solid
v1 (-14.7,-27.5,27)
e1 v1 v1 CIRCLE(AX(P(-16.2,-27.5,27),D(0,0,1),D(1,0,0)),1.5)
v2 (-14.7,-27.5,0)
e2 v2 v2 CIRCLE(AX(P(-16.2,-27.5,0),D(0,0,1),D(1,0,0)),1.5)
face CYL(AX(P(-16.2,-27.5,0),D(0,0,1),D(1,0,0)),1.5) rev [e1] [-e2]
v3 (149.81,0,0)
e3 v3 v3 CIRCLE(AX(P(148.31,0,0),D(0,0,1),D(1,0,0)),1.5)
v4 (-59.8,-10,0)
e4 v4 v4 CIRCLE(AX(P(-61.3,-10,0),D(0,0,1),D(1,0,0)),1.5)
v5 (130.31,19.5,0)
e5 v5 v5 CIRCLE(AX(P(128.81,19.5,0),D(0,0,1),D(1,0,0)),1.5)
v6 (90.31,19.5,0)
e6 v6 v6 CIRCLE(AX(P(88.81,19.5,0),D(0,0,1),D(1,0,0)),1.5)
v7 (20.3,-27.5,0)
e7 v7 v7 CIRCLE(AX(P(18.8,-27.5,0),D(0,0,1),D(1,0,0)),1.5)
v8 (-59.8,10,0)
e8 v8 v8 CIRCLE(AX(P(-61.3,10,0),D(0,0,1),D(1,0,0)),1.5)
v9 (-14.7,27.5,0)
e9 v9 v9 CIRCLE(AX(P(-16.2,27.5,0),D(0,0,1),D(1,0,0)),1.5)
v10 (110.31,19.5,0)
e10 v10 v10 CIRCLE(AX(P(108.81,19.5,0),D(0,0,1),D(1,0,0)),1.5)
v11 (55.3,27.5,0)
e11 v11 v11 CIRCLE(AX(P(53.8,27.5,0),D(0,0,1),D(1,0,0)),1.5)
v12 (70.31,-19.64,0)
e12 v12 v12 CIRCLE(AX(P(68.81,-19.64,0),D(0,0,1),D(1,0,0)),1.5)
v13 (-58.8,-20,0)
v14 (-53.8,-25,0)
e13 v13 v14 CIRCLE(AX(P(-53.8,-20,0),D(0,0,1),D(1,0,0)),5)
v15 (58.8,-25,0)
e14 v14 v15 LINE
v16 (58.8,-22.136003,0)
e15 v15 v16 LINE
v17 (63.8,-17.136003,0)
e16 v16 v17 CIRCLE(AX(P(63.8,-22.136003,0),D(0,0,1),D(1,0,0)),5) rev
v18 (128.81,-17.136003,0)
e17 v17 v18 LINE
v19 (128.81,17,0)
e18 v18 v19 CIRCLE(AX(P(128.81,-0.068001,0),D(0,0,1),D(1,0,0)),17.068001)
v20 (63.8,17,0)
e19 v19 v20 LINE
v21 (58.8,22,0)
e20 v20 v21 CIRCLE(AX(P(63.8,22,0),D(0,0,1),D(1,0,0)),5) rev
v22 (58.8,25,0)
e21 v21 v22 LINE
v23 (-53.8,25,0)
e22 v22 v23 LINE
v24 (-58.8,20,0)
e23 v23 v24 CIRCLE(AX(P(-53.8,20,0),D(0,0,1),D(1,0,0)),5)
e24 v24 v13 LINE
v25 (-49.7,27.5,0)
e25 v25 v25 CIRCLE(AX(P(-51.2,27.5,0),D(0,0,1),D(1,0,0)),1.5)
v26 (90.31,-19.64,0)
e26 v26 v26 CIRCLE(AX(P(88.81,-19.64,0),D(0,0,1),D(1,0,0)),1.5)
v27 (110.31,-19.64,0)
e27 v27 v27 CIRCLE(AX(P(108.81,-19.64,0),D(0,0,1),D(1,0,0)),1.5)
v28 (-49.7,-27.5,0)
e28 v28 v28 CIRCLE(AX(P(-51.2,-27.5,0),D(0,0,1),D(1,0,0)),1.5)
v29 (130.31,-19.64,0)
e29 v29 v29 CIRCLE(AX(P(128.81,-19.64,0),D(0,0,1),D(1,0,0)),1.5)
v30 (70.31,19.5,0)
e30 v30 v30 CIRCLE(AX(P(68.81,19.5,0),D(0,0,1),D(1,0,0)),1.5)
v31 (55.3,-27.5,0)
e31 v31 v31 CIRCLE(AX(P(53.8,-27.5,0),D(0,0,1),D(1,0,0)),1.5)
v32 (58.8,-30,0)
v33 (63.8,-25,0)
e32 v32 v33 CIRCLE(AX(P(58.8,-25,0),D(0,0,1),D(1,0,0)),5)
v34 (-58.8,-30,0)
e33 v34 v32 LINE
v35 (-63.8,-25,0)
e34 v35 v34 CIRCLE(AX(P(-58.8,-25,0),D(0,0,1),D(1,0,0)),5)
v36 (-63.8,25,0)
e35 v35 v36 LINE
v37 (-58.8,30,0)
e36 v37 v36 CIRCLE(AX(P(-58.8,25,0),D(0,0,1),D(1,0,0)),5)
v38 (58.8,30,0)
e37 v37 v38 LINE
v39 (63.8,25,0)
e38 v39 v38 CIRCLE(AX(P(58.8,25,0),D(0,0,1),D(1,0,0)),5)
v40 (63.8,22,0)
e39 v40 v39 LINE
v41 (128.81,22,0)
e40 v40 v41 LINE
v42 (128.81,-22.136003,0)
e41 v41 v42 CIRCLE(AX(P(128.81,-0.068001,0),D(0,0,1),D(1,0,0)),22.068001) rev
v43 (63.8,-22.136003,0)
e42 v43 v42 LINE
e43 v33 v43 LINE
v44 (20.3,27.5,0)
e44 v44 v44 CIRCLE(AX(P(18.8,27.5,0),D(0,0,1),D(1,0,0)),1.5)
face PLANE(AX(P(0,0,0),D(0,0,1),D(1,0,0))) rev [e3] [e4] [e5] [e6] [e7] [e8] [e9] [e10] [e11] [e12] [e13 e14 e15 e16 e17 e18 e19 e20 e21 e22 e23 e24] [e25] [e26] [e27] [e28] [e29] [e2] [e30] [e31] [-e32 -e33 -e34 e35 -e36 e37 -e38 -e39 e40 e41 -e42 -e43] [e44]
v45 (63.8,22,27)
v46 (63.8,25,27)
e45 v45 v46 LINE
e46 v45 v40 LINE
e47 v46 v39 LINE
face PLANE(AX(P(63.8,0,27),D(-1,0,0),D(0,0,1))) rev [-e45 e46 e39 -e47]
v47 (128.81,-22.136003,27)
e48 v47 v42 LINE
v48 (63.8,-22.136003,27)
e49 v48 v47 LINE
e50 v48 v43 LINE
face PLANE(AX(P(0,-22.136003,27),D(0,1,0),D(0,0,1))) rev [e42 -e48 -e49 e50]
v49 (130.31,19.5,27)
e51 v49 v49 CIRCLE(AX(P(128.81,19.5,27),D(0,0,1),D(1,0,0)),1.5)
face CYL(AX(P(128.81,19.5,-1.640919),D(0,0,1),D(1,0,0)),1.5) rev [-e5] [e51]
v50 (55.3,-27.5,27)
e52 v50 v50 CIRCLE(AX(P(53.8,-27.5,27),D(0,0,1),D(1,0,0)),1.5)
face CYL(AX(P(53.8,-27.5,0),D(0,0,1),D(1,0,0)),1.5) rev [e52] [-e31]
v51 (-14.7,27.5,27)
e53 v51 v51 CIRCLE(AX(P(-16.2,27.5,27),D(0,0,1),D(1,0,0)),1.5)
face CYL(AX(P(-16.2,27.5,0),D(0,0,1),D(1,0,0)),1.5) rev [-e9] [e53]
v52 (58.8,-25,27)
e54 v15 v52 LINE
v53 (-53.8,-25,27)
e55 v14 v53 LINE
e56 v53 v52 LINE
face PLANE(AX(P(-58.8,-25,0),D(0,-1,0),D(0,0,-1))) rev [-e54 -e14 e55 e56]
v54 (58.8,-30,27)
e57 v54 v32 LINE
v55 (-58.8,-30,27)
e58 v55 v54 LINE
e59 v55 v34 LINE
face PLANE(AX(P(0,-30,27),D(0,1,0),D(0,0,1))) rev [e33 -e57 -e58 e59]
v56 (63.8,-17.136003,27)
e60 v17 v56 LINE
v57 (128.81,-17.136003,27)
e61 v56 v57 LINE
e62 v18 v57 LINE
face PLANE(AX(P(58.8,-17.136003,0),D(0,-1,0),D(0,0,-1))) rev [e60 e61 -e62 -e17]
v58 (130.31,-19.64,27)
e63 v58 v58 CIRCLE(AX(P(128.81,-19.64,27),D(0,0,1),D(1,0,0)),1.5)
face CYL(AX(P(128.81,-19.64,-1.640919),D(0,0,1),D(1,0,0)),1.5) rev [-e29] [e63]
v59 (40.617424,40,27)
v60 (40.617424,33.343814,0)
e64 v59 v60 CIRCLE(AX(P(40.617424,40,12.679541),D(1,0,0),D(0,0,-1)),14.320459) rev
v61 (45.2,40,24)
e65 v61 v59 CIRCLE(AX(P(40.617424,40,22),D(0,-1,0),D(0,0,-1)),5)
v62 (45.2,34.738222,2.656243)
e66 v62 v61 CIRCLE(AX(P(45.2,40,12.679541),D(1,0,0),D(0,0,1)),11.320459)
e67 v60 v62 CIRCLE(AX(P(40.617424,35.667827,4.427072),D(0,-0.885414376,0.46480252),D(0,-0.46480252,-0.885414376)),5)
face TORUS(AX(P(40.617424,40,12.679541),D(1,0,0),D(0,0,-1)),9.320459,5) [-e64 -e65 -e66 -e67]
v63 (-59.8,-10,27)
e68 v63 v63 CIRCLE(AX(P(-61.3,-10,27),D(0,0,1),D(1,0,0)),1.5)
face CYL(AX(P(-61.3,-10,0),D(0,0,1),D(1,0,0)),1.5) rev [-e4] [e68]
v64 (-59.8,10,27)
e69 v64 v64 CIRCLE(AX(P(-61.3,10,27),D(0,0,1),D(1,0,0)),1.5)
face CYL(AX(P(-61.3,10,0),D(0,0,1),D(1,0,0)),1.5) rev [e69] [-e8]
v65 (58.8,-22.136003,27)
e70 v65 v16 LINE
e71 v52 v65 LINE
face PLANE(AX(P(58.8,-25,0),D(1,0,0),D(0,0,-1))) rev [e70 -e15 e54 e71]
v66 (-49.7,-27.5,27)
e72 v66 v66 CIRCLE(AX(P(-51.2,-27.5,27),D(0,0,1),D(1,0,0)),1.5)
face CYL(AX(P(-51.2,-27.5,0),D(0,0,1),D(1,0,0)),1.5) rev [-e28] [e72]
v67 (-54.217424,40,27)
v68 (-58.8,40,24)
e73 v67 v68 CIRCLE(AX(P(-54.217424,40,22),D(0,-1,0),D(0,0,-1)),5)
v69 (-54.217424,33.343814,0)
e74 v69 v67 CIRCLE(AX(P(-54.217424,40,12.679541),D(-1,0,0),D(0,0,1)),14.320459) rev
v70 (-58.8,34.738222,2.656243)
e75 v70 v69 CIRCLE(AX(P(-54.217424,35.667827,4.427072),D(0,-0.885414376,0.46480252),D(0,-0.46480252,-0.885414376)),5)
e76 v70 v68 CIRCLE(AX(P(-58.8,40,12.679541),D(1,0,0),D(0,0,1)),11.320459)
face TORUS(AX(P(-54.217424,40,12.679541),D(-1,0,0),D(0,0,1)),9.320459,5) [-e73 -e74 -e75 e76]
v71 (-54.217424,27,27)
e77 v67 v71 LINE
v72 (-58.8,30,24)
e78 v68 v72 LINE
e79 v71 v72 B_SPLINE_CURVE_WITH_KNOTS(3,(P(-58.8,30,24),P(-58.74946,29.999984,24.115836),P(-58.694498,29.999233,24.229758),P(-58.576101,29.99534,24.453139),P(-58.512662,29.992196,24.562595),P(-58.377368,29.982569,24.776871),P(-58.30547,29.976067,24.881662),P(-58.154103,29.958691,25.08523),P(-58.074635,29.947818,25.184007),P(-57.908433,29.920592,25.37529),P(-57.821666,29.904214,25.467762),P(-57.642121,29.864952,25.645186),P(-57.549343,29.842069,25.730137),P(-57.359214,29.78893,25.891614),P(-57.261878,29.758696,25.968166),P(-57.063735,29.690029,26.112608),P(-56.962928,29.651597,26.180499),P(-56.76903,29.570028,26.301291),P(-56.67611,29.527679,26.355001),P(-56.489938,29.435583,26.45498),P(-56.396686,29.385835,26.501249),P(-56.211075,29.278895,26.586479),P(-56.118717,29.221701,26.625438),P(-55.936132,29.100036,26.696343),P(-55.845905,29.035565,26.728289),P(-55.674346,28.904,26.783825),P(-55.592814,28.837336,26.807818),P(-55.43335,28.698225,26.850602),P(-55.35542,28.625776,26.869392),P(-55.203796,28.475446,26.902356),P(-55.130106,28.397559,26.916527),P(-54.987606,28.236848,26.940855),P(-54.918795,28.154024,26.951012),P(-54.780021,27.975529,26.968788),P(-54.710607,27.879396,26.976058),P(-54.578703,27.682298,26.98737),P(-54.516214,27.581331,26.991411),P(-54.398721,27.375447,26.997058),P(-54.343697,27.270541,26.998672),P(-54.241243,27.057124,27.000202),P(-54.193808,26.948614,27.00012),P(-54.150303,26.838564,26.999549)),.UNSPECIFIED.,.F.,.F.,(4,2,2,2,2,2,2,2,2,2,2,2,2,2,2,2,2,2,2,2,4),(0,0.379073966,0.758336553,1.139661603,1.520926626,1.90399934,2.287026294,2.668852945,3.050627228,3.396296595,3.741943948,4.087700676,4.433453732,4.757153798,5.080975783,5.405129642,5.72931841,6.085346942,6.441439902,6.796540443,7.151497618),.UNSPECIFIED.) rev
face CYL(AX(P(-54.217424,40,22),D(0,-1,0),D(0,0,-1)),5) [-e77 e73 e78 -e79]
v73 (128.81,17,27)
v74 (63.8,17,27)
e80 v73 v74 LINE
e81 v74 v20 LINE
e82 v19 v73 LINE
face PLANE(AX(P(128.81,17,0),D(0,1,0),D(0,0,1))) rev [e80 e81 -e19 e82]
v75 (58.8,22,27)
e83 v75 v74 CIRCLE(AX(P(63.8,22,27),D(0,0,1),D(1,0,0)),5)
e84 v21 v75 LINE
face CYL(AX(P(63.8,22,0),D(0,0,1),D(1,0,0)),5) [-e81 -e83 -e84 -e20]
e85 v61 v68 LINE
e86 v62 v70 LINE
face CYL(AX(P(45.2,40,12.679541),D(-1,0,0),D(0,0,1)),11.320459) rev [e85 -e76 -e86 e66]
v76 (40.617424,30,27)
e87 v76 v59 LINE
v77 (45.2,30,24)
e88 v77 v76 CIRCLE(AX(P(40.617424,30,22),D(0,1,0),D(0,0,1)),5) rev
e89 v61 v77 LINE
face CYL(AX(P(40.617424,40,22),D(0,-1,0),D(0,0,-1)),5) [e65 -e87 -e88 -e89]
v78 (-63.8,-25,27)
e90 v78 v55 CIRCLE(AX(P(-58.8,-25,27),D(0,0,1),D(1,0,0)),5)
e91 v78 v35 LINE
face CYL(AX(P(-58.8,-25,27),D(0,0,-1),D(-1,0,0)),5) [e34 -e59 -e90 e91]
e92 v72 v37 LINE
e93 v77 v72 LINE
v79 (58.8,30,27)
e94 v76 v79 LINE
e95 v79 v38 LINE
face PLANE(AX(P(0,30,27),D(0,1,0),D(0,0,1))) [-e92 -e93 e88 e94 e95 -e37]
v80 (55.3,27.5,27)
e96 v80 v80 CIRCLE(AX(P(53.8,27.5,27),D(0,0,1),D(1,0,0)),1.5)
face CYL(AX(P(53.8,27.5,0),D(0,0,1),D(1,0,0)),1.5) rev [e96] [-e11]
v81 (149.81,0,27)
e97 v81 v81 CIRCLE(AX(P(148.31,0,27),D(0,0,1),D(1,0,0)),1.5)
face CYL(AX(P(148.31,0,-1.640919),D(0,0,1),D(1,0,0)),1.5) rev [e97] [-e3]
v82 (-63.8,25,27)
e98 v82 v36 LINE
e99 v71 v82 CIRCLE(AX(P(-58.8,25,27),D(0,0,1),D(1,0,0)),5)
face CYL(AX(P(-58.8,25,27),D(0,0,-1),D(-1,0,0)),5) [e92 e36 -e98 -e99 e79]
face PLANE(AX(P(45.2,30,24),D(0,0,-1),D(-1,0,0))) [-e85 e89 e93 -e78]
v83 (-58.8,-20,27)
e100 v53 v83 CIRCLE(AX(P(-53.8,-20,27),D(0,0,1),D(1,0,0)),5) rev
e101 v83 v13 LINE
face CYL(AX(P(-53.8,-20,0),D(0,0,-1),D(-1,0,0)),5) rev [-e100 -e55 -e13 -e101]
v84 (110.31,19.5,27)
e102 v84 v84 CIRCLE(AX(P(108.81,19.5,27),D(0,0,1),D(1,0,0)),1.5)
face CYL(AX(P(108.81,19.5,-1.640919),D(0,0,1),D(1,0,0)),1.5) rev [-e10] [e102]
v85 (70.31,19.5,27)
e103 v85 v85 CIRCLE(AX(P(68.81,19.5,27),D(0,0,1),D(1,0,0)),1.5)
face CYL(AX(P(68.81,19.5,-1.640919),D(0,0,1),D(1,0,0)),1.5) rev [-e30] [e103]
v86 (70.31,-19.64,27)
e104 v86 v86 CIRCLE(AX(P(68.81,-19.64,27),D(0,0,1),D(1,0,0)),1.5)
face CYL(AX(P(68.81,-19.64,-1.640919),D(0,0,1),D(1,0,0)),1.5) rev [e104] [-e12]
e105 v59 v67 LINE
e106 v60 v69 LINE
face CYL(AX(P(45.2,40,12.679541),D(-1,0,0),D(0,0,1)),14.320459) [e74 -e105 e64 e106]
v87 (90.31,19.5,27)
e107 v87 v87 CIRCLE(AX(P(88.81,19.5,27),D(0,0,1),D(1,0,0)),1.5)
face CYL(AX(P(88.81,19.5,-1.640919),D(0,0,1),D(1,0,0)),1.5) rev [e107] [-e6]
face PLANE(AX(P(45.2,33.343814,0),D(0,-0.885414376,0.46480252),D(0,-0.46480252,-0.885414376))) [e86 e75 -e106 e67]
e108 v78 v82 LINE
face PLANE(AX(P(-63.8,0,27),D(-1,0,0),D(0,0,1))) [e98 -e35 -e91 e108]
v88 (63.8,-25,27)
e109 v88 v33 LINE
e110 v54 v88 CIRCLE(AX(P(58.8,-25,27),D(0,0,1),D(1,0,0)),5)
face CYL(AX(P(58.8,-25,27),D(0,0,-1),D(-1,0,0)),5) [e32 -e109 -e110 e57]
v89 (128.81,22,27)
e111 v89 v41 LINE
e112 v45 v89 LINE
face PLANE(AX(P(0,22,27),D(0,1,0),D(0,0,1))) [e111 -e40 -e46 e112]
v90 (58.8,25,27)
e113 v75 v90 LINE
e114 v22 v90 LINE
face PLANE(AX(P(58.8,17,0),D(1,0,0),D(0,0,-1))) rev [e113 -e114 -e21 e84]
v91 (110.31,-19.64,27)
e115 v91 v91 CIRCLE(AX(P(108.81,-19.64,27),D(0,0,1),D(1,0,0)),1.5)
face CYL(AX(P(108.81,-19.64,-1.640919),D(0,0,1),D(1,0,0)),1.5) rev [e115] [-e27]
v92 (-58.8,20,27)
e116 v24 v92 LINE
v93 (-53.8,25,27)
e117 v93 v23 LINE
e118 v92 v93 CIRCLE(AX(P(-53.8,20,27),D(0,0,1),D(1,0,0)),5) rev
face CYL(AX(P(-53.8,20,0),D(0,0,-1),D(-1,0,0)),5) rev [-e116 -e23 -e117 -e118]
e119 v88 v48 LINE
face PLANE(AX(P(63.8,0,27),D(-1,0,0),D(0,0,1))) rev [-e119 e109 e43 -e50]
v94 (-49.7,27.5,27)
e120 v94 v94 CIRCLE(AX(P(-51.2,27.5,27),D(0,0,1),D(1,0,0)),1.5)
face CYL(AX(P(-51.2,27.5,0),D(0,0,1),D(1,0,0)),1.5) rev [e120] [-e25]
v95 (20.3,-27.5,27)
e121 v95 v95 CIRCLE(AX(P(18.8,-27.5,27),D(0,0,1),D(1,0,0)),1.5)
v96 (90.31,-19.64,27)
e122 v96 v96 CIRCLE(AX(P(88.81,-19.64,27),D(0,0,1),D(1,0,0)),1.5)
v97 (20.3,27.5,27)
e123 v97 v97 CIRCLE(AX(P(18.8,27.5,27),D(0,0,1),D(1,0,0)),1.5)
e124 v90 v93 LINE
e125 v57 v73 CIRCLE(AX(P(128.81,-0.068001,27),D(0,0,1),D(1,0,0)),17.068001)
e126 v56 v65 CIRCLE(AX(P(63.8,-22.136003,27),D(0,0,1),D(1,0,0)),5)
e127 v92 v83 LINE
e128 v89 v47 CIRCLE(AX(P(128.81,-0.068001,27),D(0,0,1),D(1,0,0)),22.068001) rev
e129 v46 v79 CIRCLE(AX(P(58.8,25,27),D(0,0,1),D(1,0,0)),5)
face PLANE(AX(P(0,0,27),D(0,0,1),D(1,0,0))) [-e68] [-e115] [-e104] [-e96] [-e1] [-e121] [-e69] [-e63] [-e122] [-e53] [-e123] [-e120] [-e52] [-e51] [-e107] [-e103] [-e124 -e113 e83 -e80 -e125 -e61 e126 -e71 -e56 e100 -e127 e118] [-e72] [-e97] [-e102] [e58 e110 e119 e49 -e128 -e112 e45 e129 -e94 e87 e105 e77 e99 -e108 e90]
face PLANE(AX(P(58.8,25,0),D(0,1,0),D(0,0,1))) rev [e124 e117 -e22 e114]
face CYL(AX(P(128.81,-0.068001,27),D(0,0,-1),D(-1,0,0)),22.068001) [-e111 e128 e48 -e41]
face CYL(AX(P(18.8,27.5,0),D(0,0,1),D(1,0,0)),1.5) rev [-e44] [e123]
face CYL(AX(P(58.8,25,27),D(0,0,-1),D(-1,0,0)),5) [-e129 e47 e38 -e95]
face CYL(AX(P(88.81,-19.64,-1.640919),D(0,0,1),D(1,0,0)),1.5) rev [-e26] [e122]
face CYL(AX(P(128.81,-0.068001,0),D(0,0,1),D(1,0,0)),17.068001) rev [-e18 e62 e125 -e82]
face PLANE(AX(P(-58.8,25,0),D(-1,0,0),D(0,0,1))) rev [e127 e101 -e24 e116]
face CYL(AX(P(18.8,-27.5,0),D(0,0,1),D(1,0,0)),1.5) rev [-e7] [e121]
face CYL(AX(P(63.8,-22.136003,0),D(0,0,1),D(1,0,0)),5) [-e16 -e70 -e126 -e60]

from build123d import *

# Parameters (mm, degrees)
SKETCH1_R            = 10.000000000000009
BOSS_EXTRUDE1_DEPTH  = 27
CUT_EXTRUDE3_DEPTH   = 157.18313390219527
SKETCH2_R            = 1.5000000000000042
CUT_EXTRUDE4_DEPTH   = 157.18313390219527
LPATTERN1_COUNT      = 4
LPATTERN1_PITCH      = 35
LPATTERN1_COUNT_DIR2 = 2
LPATTERN1_PITCH_DIR2 = 55
LPATTERN2_COUNT      = 2
LPATTERN2_PITCH      = 20
FILLET1_R            = 5
FILLET2_R            = 5
BOSS_EXTRUDE2_DEPTH  = 104
FILLET3_R            = 5
FILLET4_R            = 5
SKETCH13_R           = 1.4999999999999973
SKETCH13_R_2         = 1.4999999999999971
CUT_EXTRUDE8_DEPTH   = 163.89624264715565


with BuildPart() as part:
    # Sketch1 → Boss-Extrude1 (new body)
    # profile 1 of 2: a face of its own
    with BuildSketch(Plane.XY):
        with BuildLine():
            Line((128.8099999999999, 22), (63.80000000000001, 22))
            Line((63.800000000000026, 22), (63.800000000000026, -22.136002859999998))
            Line((63.80000000000001, -22.136002859999998), (128.8099999999999, -22.136002859999998))
            ThreePointArc((128.8099999999999, -22.136002859999998), (150.8780014299999, -0.06800142999999757), (128.8099999999999, 22))
        make_face()
        with Locations((128.81, 0)):
            Circle(SKETCH1_R, mode=Mode.SUBTRACT)
    # profile 2 of 2: a face of its own
    with BuildSketch(Plane.XY):
        with BuildLine():
            Line((-58.799999999999976, 29.999999999999993), (58.80000000000002, 29.999999999999993))
            ThreePointArc((58.80000000000002, 29.999999999999993), (62.33553390593276, 28.535533905932734), (63.800000000000026, 24.999999999999993))
            Line((63.800000000000026, 24.999999999999993), (63.800000000000026, -25))
            ThreePointArc((63.800000000000026, -25), (62.33553390593277, -28.53553390593274), (58.80000000000003, -30.000000000000004))
            Line((58.80000000000003, -30.000000000000004), (-58.79999999999999, -30.000000000000004))
            ThreePointArc((-58.79999999999999, -30.000000000000004), (-62.33553390593272, -28.535533905932734), (-63.79999999999998, -25))
            Line((-63.79999999999998, -25), (-63.79999999999998, 24.999999999999993))
            ThreePointArc((-63.79999999999998, 24.999999999999993), (-62.335533905932714, 28.53553390593273), (-58.799999999999976, 29.999999999999993))
        make_face()
    extrude(amount=BOSS_EXTRUDE1_DEPTH)

    # Sketch4 → Cut-Extrude3 (cut, through all)
    with BuildSketch(Plane.XY.offset(27)):
        with BuildLine():
            Line((128.8099999999999, 16.999999999999996), (58.800000000000026, 16.999999999999996))
            Line((58.800000000000026, 16.999999999999996), (58.800000000000026, 24.99999999999999))
            Line((58.800000000000026, 24.99999999999999), (-58.79999999999998, 24.99999999999999))
            Line((-58.79999999999998, 24.99999999999999), (-58.79999999999998, -25))
            Line((-58.79999999999998, -25), (58.800000000000026, -25))
            Line((58.800000000000026, -25), (58.800000000000026, -17.136002859999994))
            Line((58.800000000000026, -17.136002859999994), (128.8099999999999, -17.136002859999994))
            ThreePointArc((128.8099999999999, -17.136002859999994), (145.87800142999987, -0.06800142999999897), (128.8099999999999, 16.999999999999996))
        make_face()
    extrude(amount=-CUT_EXTRUDE3_DEPTH, mode=Mode.SUBTRACT)

    # Sketch2 → Cut-Extrude4 (cut, through all)
    with BuildSketch(Plane.XY.offset(27)):
        with Locations((-51.19999999999998, 27.49999999999999)):
            Circle(SKETCH2_R)
        with Locations((-61.29999999999998, 9.999999999999991)):
            Circle(SKETCH2_R)
    cut_extrude4 = extrude(amount=-CUT_EXTRUDE4_DEPTH, mode=Mode.SUBTRACT)

    # LPattern1: Cut-Extrude4 4 × 2
    with Locations(*[(i * LPATTERN1_PITCH, -j * LPATTERN1_PITCH_DIR2, 0) for i in range(LPATTERN1_COUNT) for j in range(LPATTERN1_COUNT_DIR2) if (i, j) != (0, 0)]):
        add(cut_extrude4, mode=Mode.SUBTRACT)

    # LPattern2: Cut-Extrude4 ×2
    with Locations(*[(0, -i * LPATTERN2_PITCH, 0) for i in range(1, LPATTERN2_COUNT)]):
        add(cut_extrude4, mode=Mode.SUBTRACT)

    # Fillet1
    fillet1_edges = [part.edges().sort_by_distance(p)[0] for p in [
        (58.800000000000026, -17.136002859999994, 13.5),
        (58.800000000000026, 16.999999999999996, 13.5),
    ]]
    fillet(fillet1_edges, radius=FILLET1_R)

    # Fillet2
    fillet2_edges = [part.edges().sort_by_distance(p)[0] for p in [
        (-58.79999999999998, -25, 13.5),
        (-58.79999999999998, 24.99999999999999, 13.5),
    ]]
    fillet(fillet2_edges, radius=FILLET2_R)

    # Sketch6 → Boss-Extrude2 (add)
    with BuildSketch(Plane.ZY.offset(58.79999999999998)):
        with BuildLine():
            Line((27, 29.999999999999993), (27, 39.99999999999999))
            ThreePointArc((27, 39.99999999999999), (9.251807345621204, 53.9041792903447), (0, 33.34381438418348))
            Line((0, 33.34381438418348), (2.6562431277765906, 34.738221945171176))
            ThreePointArc((2.6562431277765906, 34.738221945171176), (9.969884854205839, 50.99138601040448), (24, 39.99999999999999))
            Line((24, 39.99999999999999), (24, 29.999999999999993))
            Line((24, 29.999999999999993), (27, 29.999999999999993))
        make_face()
    extrude(amount=-BOSS_EXTRUDE2_DEPTH)

    # Fillet3
    # the kernel refuses this fillet: 5 mm, written as the material it takes off along each edge
    with BuildSketch(Plane(origin=(-58.79999999999998, 18.543560762610387, 27), x_dir=(1, 0, 0), z_dir=(0, 1, 0))) as fillet3_piece_1_section:
        with BuildLine():
            CenterArc((4.5825756949558425, 5), FILLET3_R, 203.57817847820183, 66.42182152179817)
            Line((0, 3), (0, 0))
            Line((0, 0), (4.5825756949558425, 0))
        make_face()
    fillet3_piece_1 = extrude(amount=21.456439237389606, mode=Mode.PRIVATE)
    fillet3_piece_1 = fillet3_piece_1 - Plane(origin=(-58.79999999999997, 24.99999999999998, 26.19166673293572), x_dir=(-1, 2.84e-15, 0), z_dir=(0, 0, -1)) * Cylinder(5.000000000000014, 62, mode=Mode.PRIVATE)
    add(fillet3_piece_1, mode=Mode.SUBTRACT)
    with BuildSketch(Plane(origin=(-58.79999999999998, 39.999999999999986, 12.679540611996243), x_dir=(0, 5e-16, 1), z_dir=(0, -1, 5e-16))) as fillet3_piece_2_section:
        with BuildLine():
            CenterArc((9.320459388003757, -4.5825756949558425), FILLET3_R, 0, 66.42182152179822)
            Line((14.320459388003757, -4.5825756949558425), (14.320459388003757, 0))
            Line((14.320459388003757, 0), (11.320459388003753, 0))
        make_face()
    fillet3_piece_2 = revolve(axis=Axis((-58.79999999999998, 39.999999999999986, 12.679540611996243), (-1, 0, 0)), revolution_arc=253.63253481622772, mode=Mode.PRIVATE)
    fillet3_piece_2 = split(fillet3_piece_2, bisect_by=Plane(origin=(-58.68295720401122, 29.999999999999993, 23.934406963840928), z_dir=(0, 1, 0)), keep=Keep.TOP, mode=Mode.PRIVATE)
    add(fillet3_piece_2, mode=Mode.SUBTRACT)

    # Fillet4
    # the kernel refuses this fillet: 5 mm, written as the material it takes off along each edge
    with BuildSketch(Plane(origin=(45.20000000000002, 29.999999999999993, 27), x_dir=(-1, 0, 0), z_dir=(0, 1, 0))) as fillet4_piece_1:
        with BuildLine():
            CenterArc((4.5825756949558425, -5), FILLET4_R, 90, 66.42182152179817)
            Line((0, -3), (0, 0))
            Line((0, 0), (4.5825756949558425, 0))
        make_face()
    extrude(amount=10, mode=Mode.SUBTRACT)
    with BuildSketch(Plane(origin=(45.20000000000002, 39.999999999999986, 12.679540611996243), x_dir=(0, 5e-16, 1), z_dir=(0, -1, 5e-16))) as fillet4_piece_2_section:
        with BuildLine():
            CenterArc((9.320459388003757, 4.582575694955835), FILLET4_R, 293.57817847820183, 66.42182152179817)
            Line((11.320459388003757, -7.11e-15), (14.320459388003757, 0))
            Line((14.320459388003757, 0), (14.320459388003757, 4.582575694955835))
        make_face()
    fillet4_piece_2 = revolve(axis=Axis((45.20000000000002, 39.999999999999986, 12.679540611996243), (-1, 0, 0)), revolution_arc=253.63253481622772, mode=Mode.PRIVATE)
    fillet4_piece_2 = split(fillet4_piece_2, bisect_by=Plane(origin=(43.36151431814506, 29.999999999999993, 25.79888399879933), z_dir=(0, 1, 0)), keep=Keep.TOP, mode=Mode.PRIVATE)
    add(fillet4_piece_2, mode=Mode.SUBTRACT)

    # Sketch13 → Cut-Extrude8 (cut, through all)
    with BuildSketch(Plane.XY.offset(27)):
        with Locations((68.8099999999999, 19.5)):
            Circle(SKETCH13_R)
        with Locations((88.8099999999999, 19.5)):
            Circle(SKETCH13_R)
        with Locations((108.8099999999999, 19.5)):
            Circle(SKETCH13_R)
        with Locations((128.8099999999999, 19.5)):
            Circle(SKETCH13_R)
        with Locations((88.8100000000003, -19.64)):
            Circle(SKETCH13_R)
        with Locations((108.81000000000031, -19.64)):
            Circle(SKETCH13_R)
        with Locations((128.81000000000031, -19.64)):
            Circle(SKETCH13_R)
        with Locations((68.8100000000003, -19.64)):
            Circle(SKETCH13_R)
        with Locations((148.3099999999999, 0)):
            Circle(SKETCH13_R_2)
    extrude(amount=-CUT_EXTRUDE8_DEPTH, mode=Mode.SUBTRACT)


solid = part.part
